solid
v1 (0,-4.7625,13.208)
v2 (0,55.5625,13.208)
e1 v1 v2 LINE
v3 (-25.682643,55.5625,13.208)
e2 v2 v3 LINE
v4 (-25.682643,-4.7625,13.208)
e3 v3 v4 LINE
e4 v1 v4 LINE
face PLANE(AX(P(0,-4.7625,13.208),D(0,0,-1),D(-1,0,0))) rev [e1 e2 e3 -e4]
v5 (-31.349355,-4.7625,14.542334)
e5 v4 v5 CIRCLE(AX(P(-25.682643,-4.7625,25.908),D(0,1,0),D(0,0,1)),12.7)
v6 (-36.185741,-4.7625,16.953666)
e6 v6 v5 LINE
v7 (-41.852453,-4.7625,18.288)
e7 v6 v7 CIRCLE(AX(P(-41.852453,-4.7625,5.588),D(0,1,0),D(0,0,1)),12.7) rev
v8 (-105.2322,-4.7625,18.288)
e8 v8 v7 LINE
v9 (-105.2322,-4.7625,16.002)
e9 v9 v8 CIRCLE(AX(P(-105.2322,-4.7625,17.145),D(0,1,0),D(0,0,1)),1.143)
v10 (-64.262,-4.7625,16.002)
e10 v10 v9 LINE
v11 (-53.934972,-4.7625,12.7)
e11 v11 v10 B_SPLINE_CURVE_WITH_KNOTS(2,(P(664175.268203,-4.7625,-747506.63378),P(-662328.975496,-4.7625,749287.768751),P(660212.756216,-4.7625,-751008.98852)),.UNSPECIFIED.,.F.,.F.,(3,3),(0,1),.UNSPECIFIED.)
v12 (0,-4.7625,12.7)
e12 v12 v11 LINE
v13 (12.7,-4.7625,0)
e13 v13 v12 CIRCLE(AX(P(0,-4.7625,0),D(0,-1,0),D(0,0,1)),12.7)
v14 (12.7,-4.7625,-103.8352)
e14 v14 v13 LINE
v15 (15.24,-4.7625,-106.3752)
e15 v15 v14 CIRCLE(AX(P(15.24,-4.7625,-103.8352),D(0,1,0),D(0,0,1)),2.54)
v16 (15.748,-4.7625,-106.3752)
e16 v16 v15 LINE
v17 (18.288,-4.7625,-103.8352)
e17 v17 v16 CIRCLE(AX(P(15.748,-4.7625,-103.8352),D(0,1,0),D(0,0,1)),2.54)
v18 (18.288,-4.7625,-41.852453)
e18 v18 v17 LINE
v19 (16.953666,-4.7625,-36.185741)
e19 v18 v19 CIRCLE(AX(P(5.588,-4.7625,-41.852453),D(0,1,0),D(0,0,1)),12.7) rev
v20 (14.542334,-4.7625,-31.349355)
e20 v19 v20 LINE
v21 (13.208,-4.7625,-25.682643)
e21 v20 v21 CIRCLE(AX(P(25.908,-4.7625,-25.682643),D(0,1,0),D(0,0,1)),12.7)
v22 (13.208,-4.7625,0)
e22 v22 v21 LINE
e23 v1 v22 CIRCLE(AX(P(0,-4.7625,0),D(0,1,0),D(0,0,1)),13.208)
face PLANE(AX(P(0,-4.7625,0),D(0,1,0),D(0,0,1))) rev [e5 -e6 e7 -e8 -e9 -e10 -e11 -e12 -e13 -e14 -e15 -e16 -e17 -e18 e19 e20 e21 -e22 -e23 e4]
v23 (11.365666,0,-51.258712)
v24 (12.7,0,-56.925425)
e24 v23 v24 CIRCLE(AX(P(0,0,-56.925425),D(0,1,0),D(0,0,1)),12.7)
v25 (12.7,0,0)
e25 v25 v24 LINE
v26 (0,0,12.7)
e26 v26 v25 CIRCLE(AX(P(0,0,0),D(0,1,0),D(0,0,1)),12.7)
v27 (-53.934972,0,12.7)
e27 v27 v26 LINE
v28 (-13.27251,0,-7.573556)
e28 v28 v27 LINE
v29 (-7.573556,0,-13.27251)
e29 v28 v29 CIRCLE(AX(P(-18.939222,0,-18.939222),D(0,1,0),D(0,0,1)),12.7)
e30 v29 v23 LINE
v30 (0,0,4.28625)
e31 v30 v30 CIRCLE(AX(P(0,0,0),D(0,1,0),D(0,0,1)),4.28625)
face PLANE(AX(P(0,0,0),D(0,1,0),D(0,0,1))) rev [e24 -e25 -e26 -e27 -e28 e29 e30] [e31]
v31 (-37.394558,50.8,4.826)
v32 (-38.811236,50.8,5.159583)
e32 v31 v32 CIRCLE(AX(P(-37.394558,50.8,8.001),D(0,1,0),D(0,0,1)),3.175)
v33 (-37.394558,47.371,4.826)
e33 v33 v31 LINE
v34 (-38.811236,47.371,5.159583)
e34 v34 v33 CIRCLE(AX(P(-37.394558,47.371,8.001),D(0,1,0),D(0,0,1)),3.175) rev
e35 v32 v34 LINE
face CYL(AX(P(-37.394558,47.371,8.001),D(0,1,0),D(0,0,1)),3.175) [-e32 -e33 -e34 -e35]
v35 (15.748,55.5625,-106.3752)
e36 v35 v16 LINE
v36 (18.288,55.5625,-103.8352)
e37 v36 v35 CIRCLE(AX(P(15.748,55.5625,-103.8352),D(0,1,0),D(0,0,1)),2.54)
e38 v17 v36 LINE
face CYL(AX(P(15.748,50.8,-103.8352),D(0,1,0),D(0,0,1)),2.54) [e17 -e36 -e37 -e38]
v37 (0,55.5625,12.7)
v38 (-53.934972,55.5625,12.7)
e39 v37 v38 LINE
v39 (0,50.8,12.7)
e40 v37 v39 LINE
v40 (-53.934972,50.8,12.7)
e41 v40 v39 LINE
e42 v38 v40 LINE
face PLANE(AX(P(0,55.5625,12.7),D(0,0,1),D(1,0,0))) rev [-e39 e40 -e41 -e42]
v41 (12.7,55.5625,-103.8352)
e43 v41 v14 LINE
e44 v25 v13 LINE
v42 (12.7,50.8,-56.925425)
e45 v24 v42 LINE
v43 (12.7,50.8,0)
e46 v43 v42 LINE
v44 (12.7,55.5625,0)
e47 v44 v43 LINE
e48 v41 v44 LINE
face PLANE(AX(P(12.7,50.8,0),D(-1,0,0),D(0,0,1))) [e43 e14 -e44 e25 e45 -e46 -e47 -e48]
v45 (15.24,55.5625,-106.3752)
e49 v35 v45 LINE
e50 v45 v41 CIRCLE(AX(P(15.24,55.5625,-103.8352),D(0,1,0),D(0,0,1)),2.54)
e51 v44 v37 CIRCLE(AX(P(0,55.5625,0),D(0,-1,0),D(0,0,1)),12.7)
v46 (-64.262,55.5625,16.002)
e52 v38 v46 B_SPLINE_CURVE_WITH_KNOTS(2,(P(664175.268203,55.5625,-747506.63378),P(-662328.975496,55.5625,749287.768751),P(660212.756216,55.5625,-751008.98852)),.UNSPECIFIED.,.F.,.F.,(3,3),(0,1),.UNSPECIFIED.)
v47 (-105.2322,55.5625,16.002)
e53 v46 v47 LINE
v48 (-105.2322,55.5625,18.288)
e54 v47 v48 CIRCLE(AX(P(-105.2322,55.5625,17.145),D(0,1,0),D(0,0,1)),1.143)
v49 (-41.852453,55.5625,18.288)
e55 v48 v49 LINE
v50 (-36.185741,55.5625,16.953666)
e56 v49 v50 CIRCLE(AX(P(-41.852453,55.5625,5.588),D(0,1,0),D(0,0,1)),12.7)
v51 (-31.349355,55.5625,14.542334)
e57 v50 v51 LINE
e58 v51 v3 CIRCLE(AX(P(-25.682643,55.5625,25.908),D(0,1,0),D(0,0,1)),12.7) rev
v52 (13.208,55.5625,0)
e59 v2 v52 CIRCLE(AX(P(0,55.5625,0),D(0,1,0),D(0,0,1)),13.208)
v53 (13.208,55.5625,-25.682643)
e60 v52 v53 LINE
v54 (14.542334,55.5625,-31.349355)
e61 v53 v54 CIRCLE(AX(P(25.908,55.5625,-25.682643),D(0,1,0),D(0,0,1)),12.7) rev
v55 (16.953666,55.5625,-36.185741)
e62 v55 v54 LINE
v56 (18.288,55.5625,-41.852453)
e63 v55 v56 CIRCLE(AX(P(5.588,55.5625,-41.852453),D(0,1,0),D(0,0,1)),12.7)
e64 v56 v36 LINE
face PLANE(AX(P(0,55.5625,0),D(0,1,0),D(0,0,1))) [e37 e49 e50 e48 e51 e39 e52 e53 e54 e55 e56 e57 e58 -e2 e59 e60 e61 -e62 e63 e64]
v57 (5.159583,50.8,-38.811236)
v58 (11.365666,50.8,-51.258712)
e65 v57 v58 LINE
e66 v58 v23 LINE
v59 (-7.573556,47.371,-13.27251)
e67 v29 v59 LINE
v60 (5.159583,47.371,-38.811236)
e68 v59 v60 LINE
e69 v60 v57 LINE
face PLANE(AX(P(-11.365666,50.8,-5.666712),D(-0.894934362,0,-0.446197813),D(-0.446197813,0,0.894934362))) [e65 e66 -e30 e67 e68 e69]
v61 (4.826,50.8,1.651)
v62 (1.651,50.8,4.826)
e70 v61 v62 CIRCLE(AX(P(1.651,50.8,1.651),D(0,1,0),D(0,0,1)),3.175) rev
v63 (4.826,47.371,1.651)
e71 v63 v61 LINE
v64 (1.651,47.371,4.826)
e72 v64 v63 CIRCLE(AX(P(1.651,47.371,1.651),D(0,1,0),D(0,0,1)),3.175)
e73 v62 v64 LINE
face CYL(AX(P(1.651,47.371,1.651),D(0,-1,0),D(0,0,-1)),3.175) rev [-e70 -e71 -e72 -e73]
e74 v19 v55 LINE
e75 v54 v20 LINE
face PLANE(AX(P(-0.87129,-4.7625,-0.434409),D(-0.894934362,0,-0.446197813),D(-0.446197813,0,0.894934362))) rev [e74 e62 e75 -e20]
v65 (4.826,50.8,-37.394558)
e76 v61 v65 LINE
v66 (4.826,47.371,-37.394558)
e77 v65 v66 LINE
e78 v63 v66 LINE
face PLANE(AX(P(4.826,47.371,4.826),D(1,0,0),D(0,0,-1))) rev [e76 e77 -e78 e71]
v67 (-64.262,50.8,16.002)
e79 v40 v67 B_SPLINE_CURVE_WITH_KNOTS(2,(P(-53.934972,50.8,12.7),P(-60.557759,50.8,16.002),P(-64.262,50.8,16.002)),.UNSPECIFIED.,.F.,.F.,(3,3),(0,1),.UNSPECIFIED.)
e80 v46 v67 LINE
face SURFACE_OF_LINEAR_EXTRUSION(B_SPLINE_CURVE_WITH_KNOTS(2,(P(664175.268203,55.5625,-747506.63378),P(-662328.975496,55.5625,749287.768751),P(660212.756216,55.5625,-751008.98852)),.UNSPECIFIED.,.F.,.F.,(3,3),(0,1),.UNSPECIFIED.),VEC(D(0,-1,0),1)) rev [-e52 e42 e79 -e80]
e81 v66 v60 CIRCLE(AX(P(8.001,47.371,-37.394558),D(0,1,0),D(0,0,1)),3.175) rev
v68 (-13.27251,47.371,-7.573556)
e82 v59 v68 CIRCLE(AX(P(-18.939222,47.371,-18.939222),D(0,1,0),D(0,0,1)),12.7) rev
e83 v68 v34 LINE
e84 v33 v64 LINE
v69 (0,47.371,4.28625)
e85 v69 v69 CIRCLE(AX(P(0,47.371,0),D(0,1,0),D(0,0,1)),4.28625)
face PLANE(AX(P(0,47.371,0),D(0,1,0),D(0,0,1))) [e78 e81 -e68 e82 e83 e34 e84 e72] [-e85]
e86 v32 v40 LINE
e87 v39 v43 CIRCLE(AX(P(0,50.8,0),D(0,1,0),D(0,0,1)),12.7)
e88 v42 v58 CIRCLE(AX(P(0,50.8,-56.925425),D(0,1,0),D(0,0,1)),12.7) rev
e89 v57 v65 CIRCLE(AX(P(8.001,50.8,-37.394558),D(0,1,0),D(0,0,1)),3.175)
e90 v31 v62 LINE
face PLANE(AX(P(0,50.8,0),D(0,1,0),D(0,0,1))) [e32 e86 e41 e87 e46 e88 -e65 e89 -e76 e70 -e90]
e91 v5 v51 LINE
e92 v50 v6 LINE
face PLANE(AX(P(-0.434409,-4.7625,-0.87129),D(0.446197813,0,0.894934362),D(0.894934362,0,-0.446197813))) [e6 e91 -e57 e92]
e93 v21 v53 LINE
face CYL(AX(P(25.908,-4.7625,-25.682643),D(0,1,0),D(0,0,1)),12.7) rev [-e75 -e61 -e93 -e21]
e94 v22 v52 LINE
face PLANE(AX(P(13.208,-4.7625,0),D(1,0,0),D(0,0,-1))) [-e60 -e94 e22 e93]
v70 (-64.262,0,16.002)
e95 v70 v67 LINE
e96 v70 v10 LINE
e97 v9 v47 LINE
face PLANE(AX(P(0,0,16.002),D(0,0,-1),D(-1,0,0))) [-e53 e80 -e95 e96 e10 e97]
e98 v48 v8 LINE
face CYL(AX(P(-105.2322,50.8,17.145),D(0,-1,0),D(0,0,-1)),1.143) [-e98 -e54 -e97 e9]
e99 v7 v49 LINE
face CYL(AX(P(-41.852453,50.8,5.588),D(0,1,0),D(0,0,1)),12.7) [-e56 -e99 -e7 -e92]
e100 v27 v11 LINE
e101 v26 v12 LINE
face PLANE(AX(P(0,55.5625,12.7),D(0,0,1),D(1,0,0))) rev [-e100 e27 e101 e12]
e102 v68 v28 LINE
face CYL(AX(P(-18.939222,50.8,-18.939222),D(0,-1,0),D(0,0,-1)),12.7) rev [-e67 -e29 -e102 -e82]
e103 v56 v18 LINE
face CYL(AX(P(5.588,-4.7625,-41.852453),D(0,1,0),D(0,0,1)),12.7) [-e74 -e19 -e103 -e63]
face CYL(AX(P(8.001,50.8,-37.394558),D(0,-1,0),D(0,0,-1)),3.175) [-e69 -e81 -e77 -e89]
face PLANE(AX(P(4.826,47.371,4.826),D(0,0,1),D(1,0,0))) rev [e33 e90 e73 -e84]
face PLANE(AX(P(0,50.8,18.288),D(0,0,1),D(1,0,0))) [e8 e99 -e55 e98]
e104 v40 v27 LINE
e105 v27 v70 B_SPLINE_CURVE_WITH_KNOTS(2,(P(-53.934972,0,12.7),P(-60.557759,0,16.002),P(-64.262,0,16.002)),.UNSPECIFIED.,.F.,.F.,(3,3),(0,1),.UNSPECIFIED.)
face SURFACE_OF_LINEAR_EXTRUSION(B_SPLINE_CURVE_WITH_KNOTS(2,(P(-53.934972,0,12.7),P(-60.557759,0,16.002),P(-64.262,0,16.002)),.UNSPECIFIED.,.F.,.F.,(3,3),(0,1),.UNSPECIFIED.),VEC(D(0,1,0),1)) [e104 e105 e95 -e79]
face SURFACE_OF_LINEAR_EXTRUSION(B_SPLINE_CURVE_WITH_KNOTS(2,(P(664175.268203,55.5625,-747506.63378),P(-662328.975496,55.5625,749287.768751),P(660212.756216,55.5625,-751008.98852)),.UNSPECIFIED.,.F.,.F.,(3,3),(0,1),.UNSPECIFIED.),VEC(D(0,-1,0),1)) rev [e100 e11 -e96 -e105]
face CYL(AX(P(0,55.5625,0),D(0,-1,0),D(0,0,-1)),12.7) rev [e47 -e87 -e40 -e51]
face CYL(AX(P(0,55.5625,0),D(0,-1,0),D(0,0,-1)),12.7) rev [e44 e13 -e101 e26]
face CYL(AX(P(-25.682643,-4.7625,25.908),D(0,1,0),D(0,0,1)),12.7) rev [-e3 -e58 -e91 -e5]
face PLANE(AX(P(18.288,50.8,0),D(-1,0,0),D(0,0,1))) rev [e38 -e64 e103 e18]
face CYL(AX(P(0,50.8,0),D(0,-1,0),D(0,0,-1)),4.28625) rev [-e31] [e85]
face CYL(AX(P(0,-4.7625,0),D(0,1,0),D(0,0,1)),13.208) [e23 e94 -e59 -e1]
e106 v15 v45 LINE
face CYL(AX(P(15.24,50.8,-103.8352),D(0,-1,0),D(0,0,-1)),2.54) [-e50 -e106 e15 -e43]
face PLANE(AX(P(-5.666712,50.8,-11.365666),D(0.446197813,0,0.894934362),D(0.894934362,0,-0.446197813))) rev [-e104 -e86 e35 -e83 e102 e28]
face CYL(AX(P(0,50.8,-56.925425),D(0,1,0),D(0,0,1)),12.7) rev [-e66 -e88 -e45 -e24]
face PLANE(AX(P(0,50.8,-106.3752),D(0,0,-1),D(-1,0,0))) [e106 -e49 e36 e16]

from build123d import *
from build123d.topology import SkipClean

# Parameters (mm, degrees)
SKETCH1_R           = 4.28625
BOSS_EXTRUDE1_DEPTH = 50.8
FILLET8_R           = 12.7
SKETCH2_W           = 42.1132
SKETCH2_H           = 3.302
CUT_EXTRUDE1_DEPTH  = 159.782890609
FILLET3_R           = 2.54
FILLET6_RADIUS      = 1.143
FILLET6_LENGTH      = 50.8
BOSS_EXTRUDE2_DEPTH = 30.1625
CUT_EXTRUDE2_DEPTH  = 163.081683202
FILLET7_R           = 12.7
SKETCH7_W           = 42.968170869
SKETCH7_H           = 42.968170869
CUT_EXTRUDE3_DEPTH  = 3.429
FILLET9_R           = 3.175


with BuildPart() as part:
    # Sketch1 → Boss-Extrude1 (new body)
    with BuildSketch(Plane(origin=(0, 0, 0), x_dir=(1, 0, 0), z_dir=(0, 1, 0))):
        with BuildLine():
            Line((12.7, 53.934971632), (-9.469611004, 9.469611004))
            Line((-9.469611004, 9.469611004), (-53.934971632, -12.7))
            Line((-53.934971632, -12.7), (-106.3752, -12.7))
            Line((-106.3752, -12.7), (-106.3752, -18.288))
            Line((-106.3752, -18.288), (0, -18.288))
            ThreePointArc((0, -18.288), (12.931568814, -12.931568814), (18.288, 0))
            Line((18.288, 0), (18.288, 106.3752))
            Line((18.288, 106.3752), (12.7, 106.3752))
            Line((12.7, 106.3752), (12.7, 53.934971632))
        make_face()
        with Locations(Location((0, 0, 0), (0, 0, 270))):
            Circle(SKETCH1_R, mode=Mode.SUBTRACT)
    extrude(amount=BOSS_EXTRUDE1_DEPTH)

    # Fillet8
    fillet8_edges = [part.edges().sort_by_distance(p)[0] for p in [
        (12.7, 25.4, -53.934971632),
        (-9.469611004, 25.4, -9.469611004),
    ]]
    fillet(fillet8_edges, radius=FILLET8_R)

    # Sketch2 → Cut-Extrude1 (cut, through all)
    with BuildSketch(Plane(origin=(0, 50.8, 0), x_dir=(1, 0, 0), z_dir=(0, 1, 0))):
        with Locations((-85.3186, -14.351)):
            Rectangle(SKETCH2_W, SKETCH2_H)
        with BuildLine():
            Line((-53.934971632, -12.7), (-64.262, -12.7))
            Line((-64.262, -12.7), (-64.262, -16.002))
            add(Edge.make_bspline(
                [(-53.934971632, -12.7), (-60.557759049, -16.002), (-64.262, -16.002)],
                knots=[0, 0, 0, 1, 1, 1], degree=2))
        make_face()
    extrude(amount=-CUT_EXTRUDE1_DEPTH, mode=Mode.SUBTRACT)

    # Fillet3
    fillet3_edges = [part.edges().sort_by_distance(p)[0] for p in [
        (12.7, 25.4, -106.3752),
        (18.288, 25.4, -106.3752),
    ]]
    fillet(fillet3_edges, radius=FILLET3_R)

    # Fillet6: full round fillet: the end face becomes a half cylinder, R = half its width
    fillet6_face = Plane((-106.3752, 25.4, 17.145), x_dir=(0, 1, 0), z_dir=(-1, 0, 0))  # on the end face: x along it, z out of the body
    fillet6_slab = fillet6_face.offset(-FILLET6_RADIUS / 2) * Box(FILLET6_LENGTH, 2 * FILLET6_RADIUS, FILLET6_RADIUS, mode=Mode.PRIVATE)  # the body's end, R deep
    fillet6_round = Plane((-105.2322, 25.4, 17.145), x_dir=(-1, 0, 0), z_dir=(0, 1, 0)) * Cylinder(FILLET6_RADIUS, FILLET6_LENGTH, mode=Mode.PRIVATE)  # its axis R under the face
    add(fillet6_slab - fillet6_round, mode=Mode.SUBTRACT)

    # Sketch3 → Boss-Extrude2 (add, symmetric)
    with SkipClean():  # the faces are left unmerged after this step: merging them gives an invalid solid
        with BuildSketch(Plane(origin=(0, 25.4, 0), x_dir=(1, 0, 0), z_dir=(0, 1, 0))):
            with BuildLine():
                Line((15.748, 106.3752), (15.24, 106.3752))
                ThreePointArc((15.24, 106.3752), (13.443948776, 105.631251224), (12.7, 103.8352))
                Line((12.7, 103.8352), (12.7, 0))
                ThreePointArc((12.7, 0), (8.980256121, -8.980256121), (0, -12.7))
                Line((0, -12.7), (-53.934971632, -12.7))
                add(Edge.make_bspline(
                    [(-53.934971632, -12.7), (-60.557759049, -16.002), (-64.262, -16.002)],
                    knots=[0, 0, 0, 1, 1, 1], degree=2))
                Line((-64.262, -16.002), (-105.2322, -16.002))
                ThreePointArc((-105.2322, -16.002), (-106.3752, -17.145), (-105.2322, -18.288))
                Line((-105.2322, -18.288), (0, -18.288))
                ThreePointArc((0, -18.288), (12.931568814, -12.931568814), (18.288, 0))
                Line((18.288, 0), (18.288, 103.8352))
                ThreePointArc((18.288, 103.8352), (17.544051224, 105.631251224), (15.748, 106.3752))
            make_face()
        extrude(amount=BOSS_EXTRUDE2_DEPTH, both=True)
    add(part.part.scale(1), mode=Mode.REPLACE)  # the faces are merged on a copy

    # Sketch6 → Cut-Extrude2 (cut, through all)
    with BuildSketch(Plane(origin=(0, 55.5625, 0), x_dir=(1, 0, 0), z_dir=(0, 1, 0))):
        with BuildLine():
            Line((-38.862, -18.288), (0, -18.288))
            ThreePointArc((0, -18.288), (12.931568814, -12.931568814), (18.288, 0))
            Line((18.288, 0), (18.288, 38.862))
            Line((18.288, 38.862), (13.208, 28.673096282))
            Line((13.208, 28.673096282), (13.208, 0))
            ThreePointArc((13.208, 0), (9.339466366, -9.339466366), (0, -13.208))
            Line((0, -13.208), (-28.673096282, -13.208))
            Line((-28.673096282, -13.208), (-38.862, -18.288))
        make_face()
    extrude(amount=-CUT_EXTRUDE2_DEPTH, mode=Mode.SUBTRACT)

    # Fillet7
    fillet7_edges = [part.edges().sort_by_distance(p)[0] for p in [
        (13.208, 25.4, -28.673096282),
        (18.288, 25.4, -38.862),
        (-38.862, 25.4, 18.288),
        (-28.673096282, 25.4, 13.208),
    ]]
    fillet(fillet7_edges, radius=FILLET7_R)

    # Sketch7 → Cut-Extrude3 (cut)
    with BuildSketch(Plane(origin=(0, 50.8, 0), x_dir=(1, 0, 0), z_dir=(0, 1, 0))):
        with Locations((-16.658085435, 16.658085435)):
            Rectangle(SKETCH7_W, SKETCH7_H)
    extrude(amount=-CUT_EXTRUDE3_DEPTH, mode=Mode.SUBTRACT)

    # Fillet9
    fillet9_edges = [part.edges().sort_by_distance(p)[0] for p in [
        (4.826, 49.0855, -38.142170869),
        (4.826, 49.0855, 4.826),
        (-38.142170869, 49.0855, 4.826),
    ]]
    fillet(fillet9_edges, radius=FILLET9_R)


solid = part.part
